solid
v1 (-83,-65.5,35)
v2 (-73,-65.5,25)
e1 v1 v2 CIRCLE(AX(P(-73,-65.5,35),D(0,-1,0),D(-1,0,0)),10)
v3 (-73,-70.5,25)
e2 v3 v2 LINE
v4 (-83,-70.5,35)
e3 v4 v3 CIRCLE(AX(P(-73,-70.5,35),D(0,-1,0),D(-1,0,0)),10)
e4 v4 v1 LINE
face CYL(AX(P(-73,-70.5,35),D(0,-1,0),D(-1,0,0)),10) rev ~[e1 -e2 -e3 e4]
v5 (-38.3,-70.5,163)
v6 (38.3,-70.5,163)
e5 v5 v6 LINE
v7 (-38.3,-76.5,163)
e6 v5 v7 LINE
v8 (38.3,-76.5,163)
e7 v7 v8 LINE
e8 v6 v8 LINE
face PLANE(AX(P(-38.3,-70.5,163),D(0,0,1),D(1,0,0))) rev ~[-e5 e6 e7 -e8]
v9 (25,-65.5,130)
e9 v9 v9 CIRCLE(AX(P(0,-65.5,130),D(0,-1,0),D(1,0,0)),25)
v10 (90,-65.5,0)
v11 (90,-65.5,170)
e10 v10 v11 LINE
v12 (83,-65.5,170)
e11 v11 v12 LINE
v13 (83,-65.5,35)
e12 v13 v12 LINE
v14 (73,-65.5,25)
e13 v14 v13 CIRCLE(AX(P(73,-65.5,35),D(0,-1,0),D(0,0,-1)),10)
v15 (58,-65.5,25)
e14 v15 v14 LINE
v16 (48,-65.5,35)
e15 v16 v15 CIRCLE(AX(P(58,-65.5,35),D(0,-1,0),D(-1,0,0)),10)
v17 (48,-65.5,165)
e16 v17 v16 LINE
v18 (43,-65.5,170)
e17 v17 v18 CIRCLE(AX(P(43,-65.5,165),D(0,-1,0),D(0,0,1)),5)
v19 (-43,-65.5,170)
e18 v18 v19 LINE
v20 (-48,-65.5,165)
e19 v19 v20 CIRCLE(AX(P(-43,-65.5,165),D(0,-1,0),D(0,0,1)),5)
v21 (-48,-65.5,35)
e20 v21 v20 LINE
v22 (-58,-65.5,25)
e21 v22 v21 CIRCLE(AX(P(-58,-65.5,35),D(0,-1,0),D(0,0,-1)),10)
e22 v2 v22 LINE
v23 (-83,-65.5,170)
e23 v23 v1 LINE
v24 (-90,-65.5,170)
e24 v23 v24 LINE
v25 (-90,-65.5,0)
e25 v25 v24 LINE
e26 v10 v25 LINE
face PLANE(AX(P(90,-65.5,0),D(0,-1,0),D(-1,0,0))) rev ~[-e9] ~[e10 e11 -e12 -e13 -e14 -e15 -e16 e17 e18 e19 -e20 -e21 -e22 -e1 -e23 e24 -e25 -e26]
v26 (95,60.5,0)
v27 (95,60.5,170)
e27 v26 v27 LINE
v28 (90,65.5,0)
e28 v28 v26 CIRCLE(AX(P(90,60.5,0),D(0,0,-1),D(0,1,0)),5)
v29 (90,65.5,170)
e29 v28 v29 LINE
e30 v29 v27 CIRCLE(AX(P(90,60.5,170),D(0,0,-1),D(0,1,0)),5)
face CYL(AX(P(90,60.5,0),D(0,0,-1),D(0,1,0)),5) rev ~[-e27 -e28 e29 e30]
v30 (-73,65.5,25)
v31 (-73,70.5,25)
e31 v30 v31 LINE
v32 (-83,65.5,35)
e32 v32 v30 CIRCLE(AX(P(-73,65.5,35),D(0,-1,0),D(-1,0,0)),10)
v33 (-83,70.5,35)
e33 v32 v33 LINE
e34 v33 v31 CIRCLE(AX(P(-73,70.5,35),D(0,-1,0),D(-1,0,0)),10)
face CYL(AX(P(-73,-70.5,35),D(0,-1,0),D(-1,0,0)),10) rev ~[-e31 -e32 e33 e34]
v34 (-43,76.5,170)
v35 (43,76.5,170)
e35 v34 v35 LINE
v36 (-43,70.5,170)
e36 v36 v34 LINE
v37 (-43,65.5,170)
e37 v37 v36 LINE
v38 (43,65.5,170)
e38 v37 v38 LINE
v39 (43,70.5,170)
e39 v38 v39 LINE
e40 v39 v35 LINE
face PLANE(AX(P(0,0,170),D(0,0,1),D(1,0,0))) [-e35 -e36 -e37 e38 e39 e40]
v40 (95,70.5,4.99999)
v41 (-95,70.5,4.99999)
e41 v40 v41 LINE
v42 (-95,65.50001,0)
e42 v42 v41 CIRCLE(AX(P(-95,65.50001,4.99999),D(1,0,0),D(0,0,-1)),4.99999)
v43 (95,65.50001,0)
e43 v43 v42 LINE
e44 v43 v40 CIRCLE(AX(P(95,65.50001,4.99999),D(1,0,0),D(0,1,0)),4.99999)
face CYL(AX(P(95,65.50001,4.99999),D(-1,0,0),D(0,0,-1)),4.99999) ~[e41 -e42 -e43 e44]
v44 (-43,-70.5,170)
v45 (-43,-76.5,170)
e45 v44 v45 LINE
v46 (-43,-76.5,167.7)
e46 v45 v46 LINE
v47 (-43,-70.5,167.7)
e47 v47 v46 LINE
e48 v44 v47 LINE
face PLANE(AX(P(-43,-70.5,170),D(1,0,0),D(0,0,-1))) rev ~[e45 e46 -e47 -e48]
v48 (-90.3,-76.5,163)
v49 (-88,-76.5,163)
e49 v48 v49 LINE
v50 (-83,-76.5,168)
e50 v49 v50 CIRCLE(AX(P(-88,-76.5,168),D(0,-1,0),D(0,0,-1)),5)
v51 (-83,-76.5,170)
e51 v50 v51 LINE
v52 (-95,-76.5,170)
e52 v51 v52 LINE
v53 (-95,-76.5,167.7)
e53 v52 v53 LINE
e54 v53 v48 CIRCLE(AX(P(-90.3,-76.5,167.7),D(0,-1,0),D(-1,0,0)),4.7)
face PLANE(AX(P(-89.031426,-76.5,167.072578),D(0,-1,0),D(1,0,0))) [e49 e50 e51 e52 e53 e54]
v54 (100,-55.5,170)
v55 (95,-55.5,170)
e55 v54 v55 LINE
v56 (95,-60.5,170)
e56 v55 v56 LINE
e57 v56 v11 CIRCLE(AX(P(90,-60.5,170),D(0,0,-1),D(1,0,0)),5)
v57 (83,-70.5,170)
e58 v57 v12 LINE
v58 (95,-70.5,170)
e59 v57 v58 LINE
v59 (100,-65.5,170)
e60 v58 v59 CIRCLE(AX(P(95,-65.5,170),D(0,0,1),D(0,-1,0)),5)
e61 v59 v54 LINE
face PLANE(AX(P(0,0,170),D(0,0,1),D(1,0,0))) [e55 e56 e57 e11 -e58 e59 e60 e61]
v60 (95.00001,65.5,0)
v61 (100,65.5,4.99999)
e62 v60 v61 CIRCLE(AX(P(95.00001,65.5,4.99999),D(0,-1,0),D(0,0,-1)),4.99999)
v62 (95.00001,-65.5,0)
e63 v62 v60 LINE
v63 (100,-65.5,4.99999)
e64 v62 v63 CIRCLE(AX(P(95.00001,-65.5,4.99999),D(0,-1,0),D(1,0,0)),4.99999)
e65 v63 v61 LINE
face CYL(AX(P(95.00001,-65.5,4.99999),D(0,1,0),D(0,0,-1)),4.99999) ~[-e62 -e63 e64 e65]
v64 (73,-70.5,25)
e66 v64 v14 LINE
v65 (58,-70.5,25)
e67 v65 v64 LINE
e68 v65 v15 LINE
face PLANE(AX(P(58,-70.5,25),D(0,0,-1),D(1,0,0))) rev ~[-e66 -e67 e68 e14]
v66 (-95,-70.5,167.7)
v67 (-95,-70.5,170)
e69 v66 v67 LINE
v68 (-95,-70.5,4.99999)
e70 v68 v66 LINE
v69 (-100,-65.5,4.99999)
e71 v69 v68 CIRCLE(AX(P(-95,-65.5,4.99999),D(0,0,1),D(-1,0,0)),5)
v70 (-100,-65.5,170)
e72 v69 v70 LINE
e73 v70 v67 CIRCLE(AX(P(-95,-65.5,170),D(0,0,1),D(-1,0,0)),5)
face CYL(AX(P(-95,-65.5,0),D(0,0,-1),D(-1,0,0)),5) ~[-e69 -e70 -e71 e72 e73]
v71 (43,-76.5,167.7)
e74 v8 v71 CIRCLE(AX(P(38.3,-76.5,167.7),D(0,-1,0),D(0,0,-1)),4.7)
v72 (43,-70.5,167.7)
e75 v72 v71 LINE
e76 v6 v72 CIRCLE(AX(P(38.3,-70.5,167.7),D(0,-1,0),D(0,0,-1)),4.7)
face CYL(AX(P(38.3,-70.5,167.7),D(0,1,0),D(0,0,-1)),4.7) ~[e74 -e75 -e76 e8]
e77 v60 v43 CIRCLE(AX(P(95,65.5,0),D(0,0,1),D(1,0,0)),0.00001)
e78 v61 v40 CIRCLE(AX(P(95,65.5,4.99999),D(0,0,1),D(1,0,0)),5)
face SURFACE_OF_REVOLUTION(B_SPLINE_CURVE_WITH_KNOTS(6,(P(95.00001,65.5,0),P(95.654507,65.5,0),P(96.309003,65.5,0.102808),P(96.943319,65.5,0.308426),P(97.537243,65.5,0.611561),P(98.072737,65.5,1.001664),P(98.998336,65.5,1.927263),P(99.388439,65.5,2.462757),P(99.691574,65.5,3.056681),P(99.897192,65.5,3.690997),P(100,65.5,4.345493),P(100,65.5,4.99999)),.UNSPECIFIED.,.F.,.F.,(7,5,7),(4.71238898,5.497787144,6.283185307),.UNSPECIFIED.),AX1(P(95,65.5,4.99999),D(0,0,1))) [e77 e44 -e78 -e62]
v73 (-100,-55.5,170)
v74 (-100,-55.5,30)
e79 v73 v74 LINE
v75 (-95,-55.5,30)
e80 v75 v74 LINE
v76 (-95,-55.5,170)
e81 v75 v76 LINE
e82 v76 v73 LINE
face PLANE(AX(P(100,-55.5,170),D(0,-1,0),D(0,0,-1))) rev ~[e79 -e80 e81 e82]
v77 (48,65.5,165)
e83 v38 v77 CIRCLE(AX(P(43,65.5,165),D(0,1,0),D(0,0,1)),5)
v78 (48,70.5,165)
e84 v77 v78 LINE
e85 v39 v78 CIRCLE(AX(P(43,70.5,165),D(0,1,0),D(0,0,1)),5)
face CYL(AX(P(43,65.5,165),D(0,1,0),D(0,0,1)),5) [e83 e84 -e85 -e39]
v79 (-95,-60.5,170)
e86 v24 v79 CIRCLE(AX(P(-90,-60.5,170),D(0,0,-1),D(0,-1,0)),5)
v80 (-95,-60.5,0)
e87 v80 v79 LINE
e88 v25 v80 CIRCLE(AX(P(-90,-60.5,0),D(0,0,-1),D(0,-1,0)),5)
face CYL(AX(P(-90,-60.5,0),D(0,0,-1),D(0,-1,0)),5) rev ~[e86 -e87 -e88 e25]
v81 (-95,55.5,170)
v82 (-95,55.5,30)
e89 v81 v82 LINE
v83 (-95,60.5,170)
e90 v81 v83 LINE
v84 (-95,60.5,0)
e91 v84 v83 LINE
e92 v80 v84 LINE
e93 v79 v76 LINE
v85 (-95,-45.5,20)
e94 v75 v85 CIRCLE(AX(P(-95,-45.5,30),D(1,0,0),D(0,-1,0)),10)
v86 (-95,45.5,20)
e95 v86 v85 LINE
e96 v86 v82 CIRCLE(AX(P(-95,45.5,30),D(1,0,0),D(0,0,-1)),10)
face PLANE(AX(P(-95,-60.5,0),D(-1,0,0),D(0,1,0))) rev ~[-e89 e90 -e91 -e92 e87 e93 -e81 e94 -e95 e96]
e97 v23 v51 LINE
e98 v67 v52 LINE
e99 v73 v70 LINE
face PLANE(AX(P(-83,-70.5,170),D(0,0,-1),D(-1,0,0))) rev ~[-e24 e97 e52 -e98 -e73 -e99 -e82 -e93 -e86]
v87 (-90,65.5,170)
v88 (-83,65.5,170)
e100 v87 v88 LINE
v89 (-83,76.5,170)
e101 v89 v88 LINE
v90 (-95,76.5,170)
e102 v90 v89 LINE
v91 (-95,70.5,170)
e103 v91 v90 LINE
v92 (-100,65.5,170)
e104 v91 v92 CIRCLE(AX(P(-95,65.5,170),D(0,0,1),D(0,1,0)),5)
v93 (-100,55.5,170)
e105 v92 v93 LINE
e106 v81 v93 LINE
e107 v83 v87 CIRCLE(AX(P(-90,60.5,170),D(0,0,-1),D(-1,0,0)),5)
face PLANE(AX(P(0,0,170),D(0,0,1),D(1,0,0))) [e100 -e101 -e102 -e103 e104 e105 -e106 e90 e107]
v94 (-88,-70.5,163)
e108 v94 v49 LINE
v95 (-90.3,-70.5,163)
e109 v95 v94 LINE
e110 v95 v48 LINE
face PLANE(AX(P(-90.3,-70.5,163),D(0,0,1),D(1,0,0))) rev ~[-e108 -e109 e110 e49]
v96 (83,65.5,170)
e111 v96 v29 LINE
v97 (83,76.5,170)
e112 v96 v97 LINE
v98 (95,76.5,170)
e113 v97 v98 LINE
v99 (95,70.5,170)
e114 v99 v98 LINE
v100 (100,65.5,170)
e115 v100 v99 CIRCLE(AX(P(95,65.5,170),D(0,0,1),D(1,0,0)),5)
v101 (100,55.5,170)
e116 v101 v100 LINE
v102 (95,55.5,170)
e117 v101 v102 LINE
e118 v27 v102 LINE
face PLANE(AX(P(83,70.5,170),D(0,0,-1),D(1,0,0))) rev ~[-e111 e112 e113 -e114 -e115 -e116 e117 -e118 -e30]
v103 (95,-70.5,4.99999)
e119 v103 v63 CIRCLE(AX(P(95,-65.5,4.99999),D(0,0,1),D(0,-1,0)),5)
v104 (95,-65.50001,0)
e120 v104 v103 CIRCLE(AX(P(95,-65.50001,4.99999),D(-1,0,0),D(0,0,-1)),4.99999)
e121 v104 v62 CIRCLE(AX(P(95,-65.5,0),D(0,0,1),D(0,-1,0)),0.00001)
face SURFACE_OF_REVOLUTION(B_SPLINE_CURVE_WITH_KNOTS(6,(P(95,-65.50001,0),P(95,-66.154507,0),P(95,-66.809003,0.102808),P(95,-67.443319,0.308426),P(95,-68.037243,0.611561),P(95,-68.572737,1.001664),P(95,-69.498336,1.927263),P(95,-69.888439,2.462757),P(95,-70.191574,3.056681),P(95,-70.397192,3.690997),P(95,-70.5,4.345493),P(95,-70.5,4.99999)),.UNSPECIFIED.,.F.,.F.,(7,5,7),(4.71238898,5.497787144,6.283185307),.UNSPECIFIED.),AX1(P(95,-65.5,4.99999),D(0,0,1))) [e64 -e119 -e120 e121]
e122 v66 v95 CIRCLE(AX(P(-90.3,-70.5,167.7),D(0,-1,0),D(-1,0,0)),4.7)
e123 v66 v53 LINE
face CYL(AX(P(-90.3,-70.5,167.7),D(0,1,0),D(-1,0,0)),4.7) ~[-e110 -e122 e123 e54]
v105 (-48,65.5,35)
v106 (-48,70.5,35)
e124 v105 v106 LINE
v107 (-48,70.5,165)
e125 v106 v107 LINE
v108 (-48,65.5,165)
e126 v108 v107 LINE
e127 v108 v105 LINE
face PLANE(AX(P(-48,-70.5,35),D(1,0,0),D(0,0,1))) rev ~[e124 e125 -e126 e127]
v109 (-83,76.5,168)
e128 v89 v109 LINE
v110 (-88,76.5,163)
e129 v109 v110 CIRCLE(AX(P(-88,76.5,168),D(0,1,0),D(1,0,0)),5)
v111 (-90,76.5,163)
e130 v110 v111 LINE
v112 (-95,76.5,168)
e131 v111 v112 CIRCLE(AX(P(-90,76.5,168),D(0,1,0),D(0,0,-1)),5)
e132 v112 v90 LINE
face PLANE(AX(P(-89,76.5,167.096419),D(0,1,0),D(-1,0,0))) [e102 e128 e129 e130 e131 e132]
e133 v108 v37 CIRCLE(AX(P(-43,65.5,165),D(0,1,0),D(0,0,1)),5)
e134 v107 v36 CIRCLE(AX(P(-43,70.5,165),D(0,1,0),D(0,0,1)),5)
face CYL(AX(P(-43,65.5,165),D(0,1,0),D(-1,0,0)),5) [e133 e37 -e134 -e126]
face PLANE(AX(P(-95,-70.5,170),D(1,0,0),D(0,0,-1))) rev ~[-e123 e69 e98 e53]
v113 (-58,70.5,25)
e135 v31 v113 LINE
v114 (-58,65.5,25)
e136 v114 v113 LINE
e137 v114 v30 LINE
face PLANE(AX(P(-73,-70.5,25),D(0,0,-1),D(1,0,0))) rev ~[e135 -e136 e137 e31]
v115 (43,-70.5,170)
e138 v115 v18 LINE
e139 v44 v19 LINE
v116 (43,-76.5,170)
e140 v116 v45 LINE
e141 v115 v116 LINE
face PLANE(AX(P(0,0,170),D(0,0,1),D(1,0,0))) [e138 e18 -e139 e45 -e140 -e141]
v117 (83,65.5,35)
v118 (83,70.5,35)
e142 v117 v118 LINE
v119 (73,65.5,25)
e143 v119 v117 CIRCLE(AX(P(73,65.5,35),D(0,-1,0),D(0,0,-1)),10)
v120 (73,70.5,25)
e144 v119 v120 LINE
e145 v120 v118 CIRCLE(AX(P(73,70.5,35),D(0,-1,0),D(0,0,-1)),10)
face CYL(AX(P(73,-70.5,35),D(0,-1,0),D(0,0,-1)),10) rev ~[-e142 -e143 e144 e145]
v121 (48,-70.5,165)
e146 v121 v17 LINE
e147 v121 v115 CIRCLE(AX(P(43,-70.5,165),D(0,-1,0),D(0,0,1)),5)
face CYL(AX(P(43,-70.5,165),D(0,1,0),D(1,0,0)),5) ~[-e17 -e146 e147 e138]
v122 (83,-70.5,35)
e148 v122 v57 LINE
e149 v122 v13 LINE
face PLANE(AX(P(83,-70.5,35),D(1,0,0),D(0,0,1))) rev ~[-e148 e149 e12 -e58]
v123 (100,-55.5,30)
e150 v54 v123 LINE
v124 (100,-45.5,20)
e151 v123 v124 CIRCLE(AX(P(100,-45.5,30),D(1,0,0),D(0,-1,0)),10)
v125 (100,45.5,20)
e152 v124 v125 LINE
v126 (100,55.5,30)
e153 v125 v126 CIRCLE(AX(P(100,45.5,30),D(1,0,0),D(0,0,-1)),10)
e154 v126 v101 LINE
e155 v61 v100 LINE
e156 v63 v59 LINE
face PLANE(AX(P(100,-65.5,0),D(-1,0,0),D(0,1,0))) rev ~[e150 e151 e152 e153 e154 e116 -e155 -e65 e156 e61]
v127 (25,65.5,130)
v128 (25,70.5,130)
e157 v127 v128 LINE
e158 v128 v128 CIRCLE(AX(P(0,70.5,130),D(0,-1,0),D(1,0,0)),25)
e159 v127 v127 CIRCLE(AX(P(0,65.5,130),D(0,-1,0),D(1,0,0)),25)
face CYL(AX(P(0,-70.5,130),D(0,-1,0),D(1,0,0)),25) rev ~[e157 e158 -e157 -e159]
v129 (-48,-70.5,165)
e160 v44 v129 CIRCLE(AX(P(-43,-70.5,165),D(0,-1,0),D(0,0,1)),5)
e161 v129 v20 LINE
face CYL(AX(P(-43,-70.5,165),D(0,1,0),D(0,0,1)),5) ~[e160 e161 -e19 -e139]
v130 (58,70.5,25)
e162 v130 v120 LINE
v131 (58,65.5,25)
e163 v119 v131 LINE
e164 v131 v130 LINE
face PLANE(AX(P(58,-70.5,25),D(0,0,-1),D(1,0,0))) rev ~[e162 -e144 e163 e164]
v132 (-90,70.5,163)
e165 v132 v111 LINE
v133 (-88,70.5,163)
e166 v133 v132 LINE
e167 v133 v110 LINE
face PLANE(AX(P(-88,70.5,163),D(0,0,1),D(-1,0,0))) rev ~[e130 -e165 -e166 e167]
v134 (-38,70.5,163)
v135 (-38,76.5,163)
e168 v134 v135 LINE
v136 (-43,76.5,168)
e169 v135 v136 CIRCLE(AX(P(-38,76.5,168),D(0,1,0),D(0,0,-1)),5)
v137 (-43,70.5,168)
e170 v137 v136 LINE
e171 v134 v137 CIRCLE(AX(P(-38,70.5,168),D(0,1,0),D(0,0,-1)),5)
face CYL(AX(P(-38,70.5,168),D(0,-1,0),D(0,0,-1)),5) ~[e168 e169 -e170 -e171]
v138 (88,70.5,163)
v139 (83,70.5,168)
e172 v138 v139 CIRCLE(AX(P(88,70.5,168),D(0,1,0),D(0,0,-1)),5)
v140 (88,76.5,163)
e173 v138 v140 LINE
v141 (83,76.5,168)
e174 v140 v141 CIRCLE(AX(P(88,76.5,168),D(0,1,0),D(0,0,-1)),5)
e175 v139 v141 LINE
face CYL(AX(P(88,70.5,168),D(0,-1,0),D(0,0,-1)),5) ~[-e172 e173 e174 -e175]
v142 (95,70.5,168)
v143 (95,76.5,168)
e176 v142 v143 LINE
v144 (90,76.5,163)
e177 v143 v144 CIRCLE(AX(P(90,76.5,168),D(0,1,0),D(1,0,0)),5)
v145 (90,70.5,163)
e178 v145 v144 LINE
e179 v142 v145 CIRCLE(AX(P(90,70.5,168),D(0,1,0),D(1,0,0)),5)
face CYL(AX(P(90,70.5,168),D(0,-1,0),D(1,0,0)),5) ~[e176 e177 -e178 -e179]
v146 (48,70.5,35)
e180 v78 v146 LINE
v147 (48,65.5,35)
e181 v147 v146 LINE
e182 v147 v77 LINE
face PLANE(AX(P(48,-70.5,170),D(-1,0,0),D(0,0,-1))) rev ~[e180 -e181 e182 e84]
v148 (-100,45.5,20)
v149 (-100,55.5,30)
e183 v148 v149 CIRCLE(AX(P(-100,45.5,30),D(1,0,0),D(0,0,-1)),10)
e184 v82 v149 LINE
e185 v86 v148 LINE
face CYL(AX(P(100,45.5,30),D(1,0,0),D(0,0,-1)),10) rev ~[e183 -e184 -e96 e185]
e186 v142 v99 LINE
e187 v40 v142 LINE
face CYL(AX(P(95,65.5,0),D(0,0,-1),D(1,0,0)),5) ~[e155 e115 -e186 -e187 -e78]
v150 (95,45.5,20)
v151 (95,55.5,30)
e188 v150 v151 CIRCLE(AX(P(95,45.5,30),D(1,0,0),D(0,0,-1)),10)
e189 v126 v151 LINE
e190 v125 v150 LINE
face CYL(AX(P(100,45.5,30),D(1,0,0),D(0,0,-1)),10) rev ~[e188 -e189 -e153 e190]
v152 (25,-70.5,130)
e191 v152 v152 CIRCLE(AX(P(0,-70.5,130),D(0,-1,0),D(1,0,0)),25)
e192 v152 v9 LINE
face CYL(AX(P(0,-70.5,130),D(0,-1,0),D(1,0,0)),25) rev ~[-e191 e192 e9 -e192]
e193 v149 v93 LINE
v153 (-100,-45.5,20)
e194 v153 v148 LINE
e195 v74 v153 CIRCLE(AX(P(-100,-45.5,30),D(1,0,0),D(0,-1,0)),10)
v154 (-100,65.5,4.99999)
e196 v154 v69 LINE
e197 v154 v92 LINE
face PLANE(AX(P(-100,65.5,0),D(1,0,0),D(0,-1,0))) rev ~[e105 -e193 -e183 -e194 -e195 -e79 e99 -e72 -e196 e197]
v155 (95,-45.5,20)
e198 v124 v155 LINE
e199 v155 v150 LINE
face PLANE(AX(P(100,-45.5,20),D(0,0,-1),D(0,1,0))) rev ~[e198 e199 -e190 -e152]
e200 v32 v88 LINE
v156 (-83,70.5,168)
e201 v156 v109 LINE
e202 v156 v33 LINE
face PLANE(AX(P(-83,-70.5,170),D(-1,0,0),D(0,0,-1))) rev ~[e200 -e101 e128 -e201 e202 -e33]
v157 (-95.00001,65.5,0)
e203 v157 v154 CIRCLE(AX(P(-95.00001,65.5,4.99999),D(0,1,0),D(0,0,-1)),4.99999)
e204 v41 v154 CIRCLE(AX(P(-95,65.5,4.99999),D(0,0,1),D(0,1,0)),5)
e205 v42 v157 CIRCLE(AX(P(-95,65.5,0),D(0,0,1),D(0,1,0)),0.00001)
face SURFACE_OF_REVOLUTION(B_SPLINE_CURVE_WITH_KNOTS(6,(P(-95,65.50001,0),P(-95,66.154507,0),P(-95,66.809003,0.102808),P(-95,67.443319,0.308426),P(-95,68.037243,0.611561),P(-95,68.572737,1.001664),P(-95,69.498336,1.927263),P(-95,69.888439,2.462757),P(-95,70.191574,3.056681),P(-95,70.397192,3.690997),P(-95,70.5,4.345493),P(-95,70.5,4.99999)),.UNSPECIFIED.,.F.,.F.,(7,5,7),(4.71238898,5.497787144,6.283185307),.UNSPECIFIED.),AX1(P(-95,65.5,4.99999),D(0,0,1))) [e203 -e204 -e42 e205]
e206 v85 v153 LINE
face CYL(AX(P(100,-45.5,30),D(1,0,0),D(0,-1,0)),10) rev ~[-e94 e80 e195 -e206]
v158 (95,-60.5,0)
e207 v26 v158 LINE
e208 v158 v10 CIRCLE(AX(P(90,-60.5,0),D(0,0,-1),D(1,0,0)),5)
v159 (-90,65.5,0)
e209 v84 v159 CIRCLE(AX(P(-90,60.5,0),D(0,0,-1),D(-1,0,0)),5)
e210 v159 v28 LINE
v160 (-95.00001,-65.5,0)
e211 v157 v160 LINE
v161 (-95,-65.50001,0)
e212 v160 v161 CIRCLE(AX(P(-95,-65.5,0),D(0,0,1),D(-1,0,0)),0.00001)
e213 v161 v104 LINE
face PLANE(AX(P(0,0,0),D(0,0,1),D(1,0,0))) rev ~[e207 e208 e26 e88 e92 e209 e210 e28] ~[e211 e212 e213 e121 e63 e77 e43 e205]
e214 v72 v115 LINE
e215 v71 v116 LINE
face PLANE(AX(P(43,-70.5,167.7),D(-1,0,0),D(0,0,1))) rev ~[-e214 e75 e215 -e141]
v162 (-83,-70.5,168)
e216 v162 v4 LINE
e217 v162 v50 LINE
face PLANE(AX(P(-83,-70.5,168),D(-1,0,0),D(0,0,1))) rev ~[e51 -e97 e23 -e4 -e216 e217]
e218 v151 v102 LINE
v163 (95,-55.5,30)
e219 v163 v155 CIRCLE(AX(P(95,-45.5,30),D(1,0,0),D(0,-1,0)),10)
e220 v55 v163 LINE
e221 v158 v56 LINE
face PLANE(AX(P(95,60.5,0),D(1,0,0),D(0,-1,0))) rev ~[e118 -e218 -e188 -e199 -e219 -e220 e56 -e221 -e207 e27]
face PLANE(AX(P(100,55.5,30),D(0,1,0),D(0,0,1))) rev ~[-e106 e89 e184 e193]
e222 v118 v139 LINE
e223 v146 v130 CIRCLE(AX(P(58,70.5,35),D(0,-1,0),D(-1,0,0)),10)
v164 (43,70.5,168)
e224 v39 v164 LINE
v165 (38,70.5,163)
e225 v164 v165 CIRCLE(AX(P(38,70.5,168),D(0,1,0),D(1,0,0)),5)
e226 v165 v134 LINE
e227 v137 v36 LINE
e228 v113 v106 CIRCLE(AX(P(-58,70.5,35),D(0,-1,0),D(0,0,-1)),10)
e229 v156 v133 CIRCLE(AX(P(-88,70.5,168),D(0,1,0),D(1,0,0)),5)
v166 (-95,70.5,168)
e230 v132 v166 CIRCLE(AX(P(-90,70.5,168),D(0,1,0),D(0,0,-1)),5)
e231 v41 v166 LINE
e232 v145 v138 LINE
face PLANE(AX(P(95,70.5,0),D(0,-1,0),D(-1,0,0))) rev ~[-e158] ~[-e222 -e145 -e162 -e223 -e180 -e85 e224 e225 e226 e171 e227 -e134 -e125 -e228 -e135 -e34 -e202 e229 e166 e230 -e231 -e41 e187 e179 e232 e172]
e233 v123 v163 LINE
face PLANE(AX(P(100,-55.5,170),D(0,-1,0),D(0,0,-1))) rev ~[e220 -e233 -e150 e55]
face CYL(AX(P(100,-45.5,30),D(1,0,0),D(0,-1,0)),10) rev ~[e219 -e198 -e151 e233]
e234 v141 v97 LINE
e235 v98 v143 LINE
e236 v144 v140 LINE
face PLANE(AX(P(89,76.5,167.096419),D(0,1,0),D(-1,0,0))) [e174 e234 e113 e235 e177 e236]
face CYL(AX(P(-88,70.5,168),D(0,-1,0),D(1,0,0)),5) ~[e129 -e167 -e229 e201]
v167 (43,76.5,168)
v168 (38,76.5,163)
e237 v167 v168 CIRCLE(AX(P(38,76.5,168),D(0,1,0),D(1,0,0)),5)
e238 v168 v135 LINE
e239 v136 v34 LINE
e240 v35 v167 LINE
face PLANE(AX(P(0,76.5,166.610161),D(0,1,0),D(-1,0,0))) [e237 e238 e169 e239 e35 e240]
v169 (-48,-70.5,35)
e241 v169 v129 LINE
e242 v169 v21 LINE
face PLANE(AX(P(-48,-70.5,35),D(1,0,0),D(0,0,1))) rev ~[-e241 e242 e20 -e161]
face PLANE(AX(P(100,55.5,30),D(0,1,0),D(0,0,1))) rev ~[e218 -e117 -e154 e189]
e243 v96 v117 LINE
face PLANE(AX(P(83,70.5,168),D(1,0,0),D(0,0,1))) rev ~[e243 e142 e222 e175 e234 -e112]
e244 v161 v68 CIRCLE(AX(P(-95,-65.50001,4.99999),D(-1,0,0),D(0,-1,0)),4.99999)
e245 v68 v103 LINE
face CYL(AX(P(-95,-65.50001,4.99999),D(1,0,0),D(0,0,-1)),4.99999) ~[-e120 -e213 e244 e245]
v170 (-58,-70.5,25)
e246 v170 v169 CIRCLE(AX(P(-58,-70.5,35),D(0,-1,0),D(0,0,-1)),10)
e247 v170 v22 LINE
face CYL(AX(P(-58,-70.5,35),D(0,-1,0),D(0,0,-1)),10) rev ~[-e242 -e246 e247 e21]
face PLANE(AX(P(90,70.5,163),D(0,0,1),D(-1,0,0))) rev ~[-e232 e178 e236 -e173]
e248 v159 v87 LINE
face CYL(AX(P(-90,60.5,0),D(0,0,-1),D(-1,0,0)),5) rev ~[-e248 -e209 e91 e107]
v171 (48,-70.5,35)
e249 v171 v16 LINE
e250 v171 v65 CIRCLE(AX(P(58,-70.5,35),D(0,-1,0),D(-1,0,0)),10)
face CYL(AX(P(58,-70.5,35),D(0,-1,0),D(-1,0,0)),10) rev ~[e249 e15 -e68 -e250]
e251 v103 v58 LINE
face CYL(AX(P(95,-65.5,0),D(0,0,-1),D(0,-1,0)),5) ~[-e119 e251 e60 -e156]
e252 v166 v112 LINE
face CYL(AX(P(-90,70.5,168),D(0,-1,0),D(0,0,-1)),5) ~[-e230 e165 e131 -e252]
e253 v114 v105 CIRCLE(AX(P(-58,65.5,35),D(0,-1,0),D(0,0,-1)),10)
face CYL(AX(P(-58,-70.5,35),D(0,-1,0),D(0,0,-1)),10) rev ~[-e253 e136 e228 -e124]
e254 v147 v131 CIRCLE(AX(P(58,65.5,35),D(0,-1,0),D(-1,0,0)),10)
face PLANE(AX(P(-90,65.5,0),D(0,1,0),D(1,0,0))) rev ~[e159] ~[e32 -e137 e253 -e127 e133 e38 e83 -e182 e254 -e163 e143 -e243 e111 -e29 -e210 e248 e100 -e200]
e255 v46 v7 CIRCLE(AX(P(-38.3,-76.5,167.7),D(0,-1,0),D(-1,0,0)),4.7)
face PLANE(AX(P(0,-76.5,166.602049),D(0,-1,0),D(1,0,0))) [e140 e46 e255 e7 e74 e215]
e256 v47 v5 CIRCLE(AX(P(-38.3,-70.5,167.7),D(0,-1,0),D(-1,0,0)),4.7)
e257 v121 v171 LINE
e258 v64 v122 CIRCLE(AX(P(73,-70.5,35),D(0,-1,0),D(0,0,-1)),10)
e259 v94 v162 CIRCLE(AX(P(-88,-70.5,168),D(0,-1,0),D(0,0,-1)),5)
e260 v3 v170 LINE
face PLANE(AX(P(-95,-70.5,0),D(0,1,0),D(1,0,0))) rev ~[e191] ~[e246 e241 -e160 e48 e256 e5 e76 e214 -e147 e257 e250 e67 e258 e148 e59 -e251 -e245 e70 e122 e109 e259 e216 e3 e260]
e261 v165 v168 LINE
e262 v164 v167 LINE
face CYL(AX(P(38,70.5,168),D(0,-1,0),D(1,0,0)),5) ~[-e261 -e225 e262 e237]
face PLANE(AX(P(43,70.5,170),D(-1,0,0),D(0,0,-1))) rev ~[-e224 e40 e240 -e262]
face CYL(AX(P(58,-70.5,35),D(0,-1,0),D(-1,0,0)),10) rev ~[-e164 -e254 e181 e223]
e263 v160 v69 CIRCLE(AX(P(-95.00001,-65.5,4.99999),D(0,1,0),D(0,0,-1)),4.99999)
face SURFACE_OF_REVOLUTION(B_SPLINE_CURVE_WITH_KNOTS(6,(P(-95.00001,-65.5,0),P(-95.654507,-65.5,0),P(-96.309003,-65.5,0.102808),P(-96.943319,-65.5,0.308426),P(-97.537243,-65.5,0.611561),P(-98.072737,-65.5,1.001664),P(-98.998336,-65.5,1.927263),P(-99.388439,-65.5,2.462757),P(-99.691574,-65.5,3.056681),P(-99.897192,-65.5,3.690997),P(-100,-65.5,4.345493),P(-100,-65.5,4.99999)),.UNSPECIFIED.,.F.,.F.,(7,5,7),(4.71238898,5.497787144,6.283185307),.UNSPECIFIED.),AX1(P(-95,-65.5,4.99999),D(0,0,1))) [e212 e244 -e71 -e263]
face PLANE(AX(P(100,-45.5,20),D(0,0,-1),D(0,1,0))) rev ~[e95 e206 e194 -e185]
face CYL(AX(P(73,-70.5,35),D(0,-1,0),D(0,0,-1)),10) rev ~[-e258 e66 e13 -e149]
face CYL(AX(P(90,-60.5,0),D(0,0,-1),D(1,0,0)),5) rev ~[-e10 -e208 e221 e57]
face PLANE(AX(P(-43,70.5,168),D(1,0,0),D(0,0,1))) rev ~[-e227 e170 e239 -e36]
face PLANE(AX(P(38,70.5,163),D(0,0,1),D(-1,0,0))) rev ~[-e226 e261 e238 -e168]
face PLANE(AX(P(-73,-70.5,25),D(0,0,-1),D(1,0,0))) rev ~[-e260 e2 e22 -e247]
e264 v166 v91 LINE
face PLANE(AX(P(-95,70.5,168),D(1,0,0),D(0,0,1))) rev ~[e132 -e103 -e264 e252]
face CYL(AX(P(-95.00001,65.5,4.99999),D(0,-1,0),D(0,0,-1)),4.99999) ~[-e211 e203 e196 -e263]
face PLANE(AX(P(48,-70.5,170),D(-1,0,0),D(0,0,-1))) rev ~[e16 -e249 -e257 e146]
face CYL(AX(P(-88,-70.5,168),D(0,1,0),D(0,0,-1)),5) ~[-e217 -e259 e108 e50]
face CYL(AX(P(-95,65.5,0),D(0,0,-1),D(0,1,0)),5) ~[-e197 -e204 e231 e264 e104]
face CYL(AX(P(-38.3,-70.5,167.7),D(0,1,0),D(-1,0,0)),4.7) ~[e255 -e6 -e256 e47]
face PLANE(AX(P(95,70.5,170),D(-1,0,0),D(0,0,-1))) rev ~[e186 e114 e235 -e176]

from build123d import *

# Parameters (mm, degrees)
F1_DEPTH  = 170
F2_R      = 25
F3_DEPTH  = 250
F5_DEPTH  = 210
F6_R      = 5
F8_DEPTH  = 6
F9_R      = 4.99999
F11_DEPTH = 6


# Not quite as in the source:
# - a fillet or chamfer is up to 0.001 mm smaller than in the source, because OpenCascade refuses the exact size


with BuildPart() as f1:
    # F0 (on Top) → F1 (new body)
    with BuildSketch(Plane.XY):
        with BuildLine():
            ThreePointArc((100, 65.5), (98.5355339059, 69.0355339059), (95, 70.5))
            Line((95, 70.5), (-95, 70.5))
            ThreePointArc((-95, 70.5), (-98.5355339059, 69.0355339059), (-100, 65.5))
            Line((-100, 65.5), (-100, -65.5))
            ThreePointArc((-100, -65.5), (-98.5355339059, -69.0355339059), (-95, -70.5))
            Line((-95, -70.5), (95, -70.5))
            ThreePointArc((95, -70.5), (98.5355339059, -69.0355339059), (100, -65.5))
            Line((100, -65.5), (100, 65.5))
        make_face()
        with BuildLine():
            Line((-90, 65.5), (90, 65.5))
            ThreePointArc((90, 65.5), (93.5355339059, 64.0355339059), (95, 60.5))
            Line((95, 60.5), (95, -60.5))
            ThreePointArc((95, -60.5), (93.5355339059, -64.0355339059), (90, -65.5))
            Line((90, -65.5), (-90, -65.5))
            ThreePointArc((-90, -65.5), (-93.5355339059, -64.0355339059), (-95, -60.5))
            Line((-95, -60.5), (-95, 60.5))
            ThreePointArc((-95, 60.5), (-93.5355339059, 64.0355339059), (-90, 65.5))
        make_face(mode=Mode.SUBTRACT)
    extrude(amount=F1_DEPTH)

    # F2 (on face) → F3 (cut)
    with BuildSketch(Plane.XZ.offset(70.5)):
        with Locations((0, 130)):
            Circle(F2_R)
        with BuildLine():
            Line((-48, 170), (-83, 170))
            Line((-83, 170), (-83, 35))
            ThreePointArc((-83, 35), (-80.0710678119, 27.9289321881), (-73, 25))
            Line((-73, 25), (-58, 25))
            ThreePointArc((-58, 25), (-50.9289321881, 27.9289321881), (-48, 35))
            Line((-48, 35), (-48, 170))
        make_face()
        with BuildLine():
            Line((83, 170), (48, 170))
            Line((48, 170), (48, 35))
            ThreePointArc((48, 35), (50.9289321881, 27.9289321881), (58, 25))
            Line((58, 25), (73, 25))
            ThreePointArc((73, 25), (80.0710678119, 27.9289321881), (83, 35))
            Line((83, 35), (83, 170))
        make_face()
    extrude(amount=-F3_DEPTH, mode=Mode.SUBTRACT)

    # F4 (on face) → F5 (cut)
    with BuildSketch(Plane.YZ.offset(100)):
        with BuildLine():
            Line((55.5, 170), (-55.5, 170))
            Line((-55.5, 170), (-55.5, 30))
            ThreePointArc((-55.5, 30), (-52.5710678119, 22.9289321881), (-45.5, 20))
            Line((-45.5, 20), (45.5, 20))
            ThreePointArc((45.5, 20), (52.5710678119, 22.9289321881), (55.5, 30))
            Line((55.5, 30), (55.5, 170))
        make_face()
    extrude(amount=-F5_DEPTH, mode=Mode.SUBTRACT)

    # F6
    f6_edges = [f1.edges().sort_by_distance(p)[0] for p in [
        (-48, -68, 170),
        (48, -68, 170),
        (48, 68, 170),
        (-48, 68, 170),
    ]]
    fillet(f6_edges, radius=F6_R)

    # F7 (on face) → F8 (join)
    with BuildSketch(Plane.XZ.offset(70.5)):
        with BuildLine():
            ThreePointArc((-88, 163), (-84.4644660941, 164.4644660941), (-83, 168))
            Line((-83, 168), (-83, 170))
            Line((-83, 170), (-95, 170))
            Line((-95, 170), (-95, 167.7))
            ThreePointArc((-95, 167.7), (-93.6234018716, 164.3765981284), (-90.3, 163))
            Line((-90.3, 163), (-88, 163))
        make_face()
        with BuildLine():
            Line((43, 170), (-43, 170))
            Line((-43, 170), (-43, 167.7))
            ThreePointArc((-43, 167.7), (-41.6234018716, 164.3765981284), (-38.3, 163))
            Line((-38.3, 163), (38.3, 163))
            ThreePointArc((38.3, 163), (41.6234018716, 164.3765981284), (43, 167.7))
            Line((43, 167.7), (43, 170))
        make_face()
    extrude(amount=F8_DEPTH)

    # F9 (radius 5 in the source; OpenCascade refuses exactly that, so slightly less here)
    f9_edges = [f1.edges().sort_by_distance(p)[0] for p in [
        (-100, 0, 0),
    ]]
    fillet(f9_edges, radius=F9_R)

    # F10 (on face) → F11 (join)
    with BuildSketch(Plane(origin=(0, 70.5, 0), x_dir=(-1, 0, 0), z_dir=(0, 1, 0))):
        with BuildLine():
            ThreePointArc((-88, 163), (-84.4644660941, 164.4644660941), (-83, 168))
            Line((-83, 168), (-83, 170))
            Line((-83, 170), (-95, 170))
            Line((-95, 170), (-95, 168))
            ThreePointArc((-95, 168), (-93.5355339059, 164.4644660941), (-90, 163))
            Line((-90, 163), (-88, 163))
        make_face()
        with BuildLine():
            Line((43, 170), (-43, 170))
            Line((-43, 170), (-43, 168))
            ThreePointArc((-43, 168), (-41.5355339059, 164.4644660941), (-38, 163))
            Line((-38, 163), (38, 163))
            ThreePointArc((38, 163), (41.5355339059, 164.4644660941), (43, 168))
            Line((43, 168), (43, 170))
        make_face()
        with BuildLine():
            Line((83, 170), (83, 168))
            ThreePointArc((83, 168), (84.4644660941, 164.4644660941), (88, 163))
            Line((88, 163), (90, 163))
            ThreePointArc((90, 163), (93.5355339059, 164.4644660941), (95, 168))
            Line((95, 168), (95, 170))
            Line((95, 170), (83, 170))
        make_face()
    extrude(amount=F11_DEPTH)


solid = f1.part
